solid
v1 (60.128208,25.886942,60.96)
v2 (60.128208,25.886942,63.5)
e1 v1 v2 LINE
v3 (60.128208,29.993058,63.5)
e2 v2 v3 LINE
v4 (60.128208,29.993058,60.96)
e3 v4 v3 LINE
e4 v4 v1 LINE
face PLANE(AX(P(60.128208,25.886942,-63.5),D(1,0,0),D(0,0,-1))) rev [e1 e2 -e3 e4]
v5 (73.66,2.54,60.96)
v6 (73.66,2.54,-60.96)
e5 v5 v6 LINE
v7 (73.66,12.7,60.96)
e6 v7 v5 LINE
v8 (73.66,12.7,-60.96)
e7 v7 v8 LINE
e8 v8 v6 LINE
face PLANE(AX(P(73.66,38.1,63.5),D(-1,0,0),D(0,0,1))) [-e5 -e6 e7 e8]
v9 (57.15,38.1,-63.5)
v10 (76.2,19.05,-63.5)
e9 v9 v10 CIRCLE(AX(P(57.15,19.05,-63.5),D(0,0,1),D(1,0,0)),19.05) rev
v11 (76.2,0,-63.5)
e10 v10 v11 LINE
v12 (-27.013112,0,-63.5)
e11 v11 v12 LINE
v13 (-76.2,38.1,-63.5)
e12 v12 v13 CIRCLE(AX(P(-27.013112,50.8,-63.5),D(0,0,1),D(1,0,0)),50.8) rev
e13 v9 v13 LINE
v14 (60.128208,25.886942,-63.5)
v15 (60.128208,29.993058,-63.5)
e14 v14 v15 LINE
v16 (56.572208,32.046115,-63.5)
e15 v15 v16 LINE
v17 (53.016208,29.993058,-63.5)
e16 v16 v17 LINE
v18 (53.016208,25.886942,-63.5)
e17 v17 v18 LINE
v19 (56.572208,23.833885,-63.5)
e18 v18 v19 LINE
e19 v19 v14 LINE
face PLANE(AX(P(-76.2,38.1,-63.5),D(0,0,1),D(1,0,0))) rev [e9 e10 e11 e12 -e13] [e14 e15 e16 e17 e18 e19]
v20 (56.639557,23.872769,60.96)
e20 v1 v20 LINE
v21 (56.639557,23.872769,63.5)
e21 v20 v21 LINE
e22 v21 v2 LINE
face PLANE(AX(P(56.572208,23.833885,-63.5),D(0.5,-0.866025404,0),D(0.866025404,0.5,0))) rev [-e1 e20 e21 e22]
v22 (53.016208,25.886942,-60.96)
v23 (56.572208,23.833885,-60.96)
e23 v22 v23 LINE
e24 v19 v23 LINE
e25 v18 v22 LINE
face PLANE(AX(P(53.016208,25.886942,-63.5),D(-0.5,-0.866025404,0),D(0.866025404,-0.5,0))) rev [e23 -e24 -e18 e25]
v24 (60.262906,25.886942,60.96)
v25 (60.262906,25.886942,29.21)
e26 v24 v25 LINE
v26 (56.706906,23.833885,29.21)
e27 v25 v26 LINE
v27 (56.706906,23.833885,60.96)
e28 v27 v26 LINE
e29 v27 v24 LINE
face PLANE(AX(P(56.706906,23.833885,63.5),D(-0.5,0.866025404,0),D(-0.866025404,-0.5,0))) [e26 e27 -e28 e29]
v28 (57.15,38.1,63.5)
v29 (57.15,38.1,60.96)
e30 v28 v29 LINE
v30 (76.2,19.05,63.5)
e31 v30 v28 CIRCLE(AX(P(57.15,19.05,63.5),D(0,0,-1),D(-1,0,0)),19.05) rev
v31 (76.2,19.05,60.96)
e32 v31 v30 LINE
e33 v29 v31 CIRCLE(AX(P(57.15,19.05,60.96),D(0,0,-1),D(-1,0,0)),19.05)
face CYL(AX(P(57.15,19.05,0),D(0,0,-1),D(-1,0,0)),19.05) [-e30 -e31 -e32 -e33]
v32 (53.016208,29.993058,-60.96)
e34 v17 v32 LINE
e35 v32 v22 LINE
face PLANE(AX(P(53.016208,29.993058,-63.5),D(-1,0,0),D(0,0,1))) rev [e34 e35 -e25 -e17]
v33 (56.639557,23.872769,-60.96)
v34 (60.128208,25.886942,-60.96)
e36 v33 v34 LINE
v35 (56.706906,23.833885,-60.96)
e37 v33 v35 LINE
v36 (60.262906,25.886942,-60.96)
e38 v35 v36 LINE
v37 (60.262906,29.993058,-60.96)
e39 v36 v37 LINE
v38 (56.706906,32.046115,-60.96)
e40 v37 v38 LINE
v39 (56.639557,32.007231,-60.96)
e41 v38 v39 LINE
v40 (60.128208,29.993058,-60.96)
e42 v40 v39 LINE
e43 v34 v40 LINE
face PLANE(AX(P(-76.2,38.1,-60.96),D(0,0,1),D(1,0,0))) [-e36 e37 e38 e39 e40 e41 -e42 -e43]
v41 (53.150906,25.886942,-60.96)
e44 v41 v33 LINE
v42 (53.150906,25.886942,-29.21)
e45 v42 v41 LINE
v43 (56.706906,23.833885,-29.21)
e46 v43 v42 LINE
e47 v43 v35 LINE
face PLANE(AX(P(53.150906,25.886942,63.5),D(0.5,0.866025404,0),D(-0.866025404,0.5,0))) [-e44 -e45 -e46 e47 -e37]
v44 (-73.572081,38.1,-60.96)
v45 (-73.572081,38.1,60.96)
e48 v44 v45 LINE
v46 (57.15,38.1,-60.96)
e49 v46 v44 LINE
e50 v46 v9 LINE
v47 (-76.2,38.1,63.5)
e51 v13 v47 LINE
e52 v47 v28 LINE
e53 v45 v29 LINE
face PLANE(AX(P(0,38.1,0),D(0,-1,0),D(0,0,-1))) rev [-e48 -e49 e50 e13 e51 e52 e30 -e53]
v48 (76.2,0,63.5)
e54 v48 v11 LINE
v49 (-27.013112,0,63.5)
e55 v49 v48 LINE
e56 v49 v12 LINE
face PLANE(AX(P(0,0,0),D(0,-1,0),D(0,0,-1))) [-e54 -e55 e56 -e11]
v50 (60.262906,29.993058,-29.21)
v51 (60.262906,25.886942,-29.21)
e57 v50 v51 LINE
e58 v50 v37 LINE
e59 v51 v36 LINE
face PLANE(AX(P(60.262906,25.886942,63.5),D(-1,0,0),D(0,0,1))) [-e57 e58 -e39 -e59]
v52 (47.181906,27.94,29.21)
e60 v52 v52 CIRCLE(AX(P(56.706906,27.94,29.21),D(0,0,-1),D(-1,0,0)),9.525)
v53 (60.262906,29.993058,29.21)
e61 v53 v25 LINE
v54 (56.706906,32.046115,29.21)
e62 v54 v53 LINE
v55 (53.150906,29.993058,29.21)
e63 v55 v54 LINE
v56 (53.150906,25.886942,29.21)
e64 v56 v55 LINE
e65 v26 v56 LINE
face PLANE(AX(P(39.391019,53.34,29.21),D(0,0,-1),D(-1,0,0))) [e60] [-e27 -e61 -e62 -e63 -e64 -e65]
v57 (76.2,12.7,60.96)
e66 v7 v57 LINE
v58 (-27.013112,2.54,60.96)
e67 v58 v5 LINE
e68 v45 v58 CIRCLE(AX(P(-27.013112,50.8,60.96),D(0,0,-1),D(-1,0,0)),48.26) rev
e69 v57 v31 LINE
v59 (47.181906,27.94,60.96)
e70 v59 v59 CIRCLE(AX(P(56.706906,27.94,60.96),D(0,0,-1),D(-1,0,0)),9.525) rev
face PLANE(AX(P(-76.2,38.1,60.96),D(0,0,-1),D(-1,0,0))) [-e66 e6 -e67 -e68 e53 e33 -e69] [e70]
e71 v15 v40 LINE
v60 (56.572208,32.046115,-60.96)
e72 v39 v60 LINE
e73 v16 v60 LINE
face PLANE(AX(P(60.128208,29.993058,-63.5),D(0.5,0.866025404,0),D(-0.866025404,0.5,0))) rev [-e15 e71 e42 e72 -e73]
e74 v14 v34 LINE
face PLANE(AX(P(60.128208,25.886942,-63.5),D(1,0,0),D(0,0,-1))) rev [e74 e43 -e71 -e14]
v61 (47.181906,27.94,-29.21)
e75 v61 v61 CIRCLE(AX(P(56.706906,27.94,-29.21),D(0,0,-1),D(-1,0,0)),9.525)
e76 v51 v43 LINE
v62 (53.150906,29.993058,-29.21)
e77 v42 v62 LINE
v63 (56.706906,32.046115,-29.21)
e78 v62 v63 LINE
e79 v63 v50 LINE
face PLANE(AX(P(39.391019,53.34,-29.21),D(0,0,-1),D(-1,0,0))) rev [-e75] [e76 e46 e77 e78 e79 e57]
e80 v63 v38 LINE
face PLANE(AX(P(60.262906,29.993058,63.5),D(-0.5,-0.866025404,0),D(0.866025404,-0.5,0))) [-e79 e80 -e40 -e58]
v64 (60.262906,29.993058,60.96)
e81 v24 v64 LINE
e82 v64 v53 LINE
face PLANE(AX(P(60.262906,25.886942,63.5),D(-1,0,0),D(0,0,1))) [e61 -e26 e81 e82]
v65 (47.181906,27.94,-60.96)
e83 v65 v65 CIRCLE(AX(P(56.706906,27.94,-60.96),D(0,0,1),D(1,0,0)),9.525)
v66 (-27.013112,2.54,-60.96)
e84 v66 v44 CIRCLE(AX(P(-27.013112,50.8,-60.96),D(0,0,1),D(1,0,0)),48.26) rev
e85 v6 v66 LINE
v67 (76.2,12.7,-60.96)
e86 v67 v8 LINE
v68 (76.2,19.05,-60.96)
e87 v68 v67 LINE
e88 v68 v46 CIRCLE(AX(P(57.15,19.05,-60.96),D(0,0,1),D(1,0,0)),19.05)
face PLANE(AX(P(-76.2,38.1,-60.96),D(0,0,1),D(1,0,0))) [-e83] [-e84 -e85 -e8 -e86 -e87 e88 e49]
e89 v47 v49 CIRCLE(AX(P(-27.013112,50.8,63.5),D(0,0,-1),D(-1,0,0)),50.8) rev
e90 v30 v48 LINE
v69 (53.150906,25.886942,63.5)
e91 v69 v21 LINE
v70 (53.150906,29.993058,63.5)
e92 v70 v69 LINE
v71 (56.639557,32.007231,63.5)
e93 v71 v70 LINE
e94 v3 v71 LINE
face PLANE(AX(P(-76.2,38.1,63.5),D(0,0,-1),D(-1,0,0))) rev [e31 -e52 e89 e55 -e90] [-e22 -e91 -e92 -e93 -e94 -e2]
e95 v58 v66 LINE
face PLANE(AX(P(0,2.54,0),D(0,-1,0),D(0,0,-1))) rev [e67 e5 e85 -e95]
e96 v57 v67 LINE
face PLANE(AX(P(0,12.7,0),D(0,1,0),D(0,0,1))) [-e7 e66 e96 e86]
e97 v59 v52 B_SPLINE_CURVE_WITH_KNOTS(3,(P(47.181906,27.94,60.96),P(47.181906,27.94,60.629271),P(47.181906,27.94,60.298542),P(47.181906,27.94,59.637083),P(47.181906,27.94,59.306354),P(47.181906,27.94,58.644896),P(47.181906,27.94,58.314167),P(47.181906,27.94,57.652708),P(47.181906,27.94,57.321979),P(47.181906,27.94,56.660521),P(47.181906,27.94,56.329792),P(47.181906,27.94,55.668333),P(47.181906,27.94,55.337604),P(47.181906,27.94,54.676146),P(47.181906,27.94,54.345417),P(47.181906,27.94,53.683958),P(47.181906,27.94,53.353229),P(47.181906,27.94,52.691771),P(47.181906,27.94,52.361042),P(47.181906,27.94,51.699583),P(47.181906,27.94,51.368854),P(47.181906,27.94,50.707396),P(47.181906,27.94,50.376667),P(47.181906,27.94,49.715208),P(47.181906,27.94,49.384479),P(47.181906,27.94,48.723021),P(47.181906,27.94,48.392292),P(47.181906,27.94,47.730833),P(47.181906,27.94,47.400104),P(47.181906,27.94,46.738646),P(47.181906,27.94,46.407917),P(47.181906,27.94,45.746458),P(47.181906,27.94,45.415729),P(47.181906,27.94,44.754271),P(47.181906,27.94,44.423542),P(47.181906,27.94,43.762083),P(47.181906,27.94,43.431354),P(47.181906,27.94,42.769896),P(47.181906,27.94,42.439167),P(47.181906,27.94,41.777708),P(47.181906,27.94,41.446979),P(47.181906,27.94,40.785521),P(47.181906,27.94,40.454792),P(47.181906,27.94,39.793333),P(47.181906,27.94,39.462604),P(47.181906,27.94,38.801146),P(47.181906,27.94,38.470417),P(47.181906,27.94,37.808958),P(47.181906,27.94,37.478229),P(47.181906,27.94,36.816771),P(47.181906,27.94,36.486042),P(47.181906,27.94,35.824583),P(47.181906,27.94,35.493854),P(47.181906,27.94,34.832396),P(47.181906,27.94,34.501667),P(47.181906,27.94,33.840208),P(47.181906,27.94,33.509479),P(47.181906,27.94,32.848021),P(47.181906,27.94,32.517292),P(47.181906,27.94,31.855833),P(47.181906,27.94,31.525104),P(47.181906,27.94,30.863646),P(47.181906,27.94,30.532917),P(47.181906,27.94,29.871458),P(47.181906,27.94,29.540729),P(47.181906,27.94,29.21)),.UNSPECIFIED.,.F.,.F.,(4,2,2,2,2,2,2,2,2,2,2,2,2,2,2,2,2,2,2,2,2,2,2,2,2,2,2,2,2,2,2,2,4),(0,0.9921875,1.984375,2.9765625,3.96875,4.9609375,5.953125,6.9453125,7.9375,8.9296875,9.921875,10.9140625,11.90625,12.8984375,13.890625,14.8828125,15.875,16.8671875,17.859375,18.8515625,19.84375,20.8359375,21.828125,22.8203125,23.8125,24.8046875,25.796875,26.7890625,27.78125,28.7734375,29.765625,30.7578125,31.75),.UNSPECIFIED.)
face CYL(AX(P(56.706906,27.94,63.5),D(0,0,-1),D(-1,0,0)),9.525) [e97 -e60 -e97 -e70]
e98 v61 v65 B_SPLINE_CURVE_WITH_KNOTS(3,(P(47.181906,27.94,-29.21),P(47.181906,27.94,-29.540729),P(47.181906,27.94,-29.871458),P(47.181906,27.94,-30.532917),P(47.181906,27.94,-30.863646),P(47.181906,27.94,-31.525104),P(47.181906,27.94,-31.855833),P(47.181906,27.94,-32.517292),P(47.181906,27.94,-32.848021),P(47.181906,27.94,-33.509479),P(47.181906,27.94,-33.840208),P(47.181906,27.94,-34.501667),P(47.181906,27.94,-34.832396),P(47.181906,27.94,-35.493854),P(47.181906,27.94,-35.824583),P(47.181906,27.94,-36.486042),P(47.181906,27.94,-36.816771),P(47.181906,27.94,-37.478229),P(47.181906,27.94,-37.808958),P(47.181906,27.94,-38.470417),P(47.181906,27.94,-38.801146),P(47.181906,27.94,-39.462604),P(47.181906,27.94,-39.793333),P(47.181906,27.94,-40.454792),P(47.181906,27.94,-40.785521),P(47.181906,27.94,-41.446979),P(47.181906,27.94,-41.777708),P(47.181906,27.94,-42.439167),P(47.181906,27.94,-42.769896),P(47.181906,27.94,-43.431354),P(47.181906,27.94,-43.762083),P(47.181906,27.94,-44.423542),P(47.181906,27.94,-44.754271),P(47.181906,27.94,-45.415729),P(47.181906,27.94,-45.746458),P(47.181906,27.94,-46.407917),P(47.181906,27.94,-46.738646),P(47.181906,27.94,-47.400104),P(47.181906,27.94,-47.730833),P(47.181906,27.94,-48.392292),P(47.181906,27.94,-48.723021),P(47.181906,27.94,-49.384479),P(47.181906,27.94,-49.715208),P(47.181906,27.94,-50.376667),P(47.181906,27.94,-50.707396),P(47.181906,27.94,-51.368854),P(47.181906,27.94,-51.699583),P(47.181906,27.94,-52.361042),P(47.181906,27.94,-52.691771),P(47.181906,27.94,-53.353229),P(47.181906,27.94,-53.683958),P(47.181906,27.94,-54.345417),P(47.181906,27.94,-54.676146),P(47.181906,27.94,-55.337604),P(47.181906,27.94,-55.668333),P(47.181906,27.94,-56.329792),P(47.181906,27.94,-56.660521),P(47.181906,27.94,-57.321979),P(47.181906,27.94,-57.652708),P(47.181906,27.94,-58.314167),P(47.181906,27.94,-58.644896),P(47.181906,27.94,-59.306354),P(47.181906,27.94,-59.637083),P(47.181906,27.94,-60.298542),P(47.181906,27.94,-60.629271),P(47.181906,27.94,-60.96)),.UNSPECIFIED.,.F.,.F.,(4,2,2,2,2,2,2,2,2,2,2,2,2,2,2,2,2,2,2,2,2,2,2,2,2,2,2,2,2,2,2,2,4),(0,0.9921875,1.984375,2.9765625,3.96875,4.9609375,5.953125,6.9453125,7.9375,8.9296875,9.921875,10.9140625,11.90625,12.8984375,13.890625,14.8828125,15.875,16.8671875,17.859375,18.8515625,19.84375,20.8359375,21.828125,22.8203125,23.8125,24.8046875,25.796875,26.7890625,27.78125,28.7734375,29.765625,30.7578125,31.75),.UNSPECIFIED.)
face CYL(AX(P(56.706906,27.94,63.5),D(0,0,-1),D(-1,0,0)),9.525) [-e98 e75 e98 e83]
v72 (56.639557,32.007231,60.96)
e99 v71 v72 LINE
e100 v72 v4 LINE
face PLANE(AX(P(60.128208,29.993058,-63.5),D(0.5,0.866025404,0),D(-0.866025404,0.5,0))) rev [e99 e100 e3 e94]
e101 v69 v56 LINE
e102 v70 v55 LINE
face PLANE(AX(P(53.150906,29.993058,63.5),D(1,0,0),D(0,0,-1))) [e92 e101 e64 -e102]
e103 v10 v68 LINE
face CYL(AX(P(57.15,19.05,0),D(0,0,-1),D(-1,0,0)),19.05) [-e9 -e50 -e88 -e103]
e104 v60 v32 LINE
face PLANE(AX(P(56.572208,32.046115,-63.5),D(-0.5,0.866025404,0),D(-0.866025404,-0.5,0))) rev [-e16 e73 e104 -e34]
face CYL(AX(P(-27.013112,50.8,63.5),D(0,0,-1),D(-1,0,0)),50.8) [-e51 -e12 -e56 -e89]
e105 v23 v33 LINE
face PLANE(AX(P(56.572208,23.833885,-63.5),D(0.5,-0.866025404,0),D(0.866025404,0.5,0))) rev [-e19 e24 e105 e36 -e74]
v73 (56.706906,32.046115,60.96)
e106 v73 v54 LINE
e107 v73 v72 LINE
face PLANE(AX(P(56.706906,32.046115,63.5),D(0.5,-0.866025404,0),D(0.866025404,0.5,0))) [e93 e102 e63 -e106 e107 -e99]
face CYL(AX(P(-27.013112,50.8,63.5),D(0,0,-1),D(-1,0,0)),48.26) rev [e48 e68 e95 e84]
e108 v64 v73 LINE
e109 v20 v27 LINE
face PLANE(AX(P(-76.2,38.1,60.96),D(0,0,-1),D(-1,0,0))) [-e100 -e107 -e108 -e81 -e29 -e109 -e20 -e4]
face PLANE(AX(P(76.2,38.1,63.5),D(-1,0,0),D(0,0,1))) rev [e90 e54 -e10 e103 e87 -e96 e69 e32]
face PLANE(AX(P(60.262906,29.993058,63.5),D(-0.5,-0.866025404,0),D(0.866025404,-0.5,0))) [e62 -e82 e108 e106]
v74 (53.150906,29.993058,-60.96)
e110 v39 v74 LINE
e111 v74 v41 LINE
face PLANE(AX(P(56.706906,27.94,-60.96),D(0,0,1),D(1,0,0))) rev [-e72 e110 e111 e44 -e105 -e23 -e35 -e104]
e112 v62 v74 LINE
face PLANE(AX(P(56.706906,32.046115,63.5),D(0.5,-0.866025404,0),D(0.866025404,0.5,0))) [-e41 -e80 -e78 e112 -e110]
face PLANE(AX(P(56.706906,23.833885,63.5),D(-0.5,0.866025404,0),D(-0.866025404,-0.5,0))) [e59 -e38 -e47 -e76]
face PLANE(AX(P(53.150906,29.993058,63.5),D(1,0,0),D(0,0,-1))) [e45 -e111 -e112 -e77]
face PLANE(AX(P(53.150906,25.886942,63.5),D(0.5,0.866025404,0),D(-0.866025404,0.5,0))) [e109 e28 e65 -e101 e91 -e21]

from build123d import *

# Parameters (mm, degrees)
SKETCH1_W               = 152.4
SKETCH1_H               = 127
BOSS_EXTRUDE1_DEPTH     = 38.1
FILLET1_R               = 50.8
SHELL1_T                = -2.54
CUT_EXTRUDE2_DEPTH      = 151.825533647
CUT_EXTRUDE2_DEPTH_BACK = 151.825533647
SKETCH4_R               = 9.525
BOSS_EXTRUDE2_DEPTH     = 124.46
SKETCH2_W               = 11.613456366
SKETCH2_H               = 121.92
CUT_EXTRUDE3_DEPTH      = 25.4
SKETCH5_W               = 29.081811675
SKETCH5_H               = 58.42
CUT_EXTRUDE4_DEPTH      = 50.8
FILLET3_R               = 19.05


with BuildPart() as part:
    # Sketch1 → Boss-Extrude1 (new body)
    with BuildSketch(Plane(origin=(0, 0, 0), x_dir=(1, 0, 0), z_dir=(0, 1, 0))):
        Rectangle(SKETCH1_W, SKETCH1_H)
    extrude(amount=BOSS_EXTRUDE1_DEPTH)

    # Fillet1
    # the kernel refuses this fillet: 50.8 mm, written as the material it takes off along each edge
    with BuildSketch(Plane(origin=(-76.2, 0, -186.467221242), x_dir=(0, 1, 0), z_dir=(0, 0, 1))) as fillet1_piece_1:
        with BuildLine():
            CenterArc((50.8, -49.186888497), FILLET1_R, 104.477512186, 75.522487814)
            Line((0, -49.186888497), (-1.016, -49.186888497))
            Line((-1.016, -49.186888497), (-1.016, 0))
            Line((-1.016, 0), (0, 1.016))
            ThreePointArc((0, 1.016), (19.05, 1.016), (37.846, 0.98373777))
            Line((37.846, 0.98373777), (38.1, 0))
        make_face()
    extrude(amount=372.934442484, mode=Mode.SUBTRACT)

    # Shell1
    shell1_openings = [part.faces().sort_by_distance(p)[0] for p in [
        (0, 38.1, 0),
    ]]
    offset(amount=SHELL1_T, openings=shell1_openings, kind=Kind.INTERSECTION)

    # Sketch3 → Cut-Extrude2 (cut, two sides: drawn at the far end of the back side and taken through both)
    with BuildSketch(Plane.XY.offset(-60.96).offset(-CUT_EXTRUDE2_DEPTH_BACK)):
        Polygon((56.572208389, 32.046115114), (53.016208389, 29.993057557), (53.016208389, 25.886942443), (56.572208389, 23.833884886), (60.128208389, 25.886942443), (60.128208389, 29.993057557), align=None)
    extrude(amount=CUT_EXTRUDE2_DEPTH + CUT_EXTRUDE2_DEPTH_BACK, mode=Mode.SUBTRACT)

    # Sketch4 → Boss-Extrude2 (add)
    with BuildSketch(Plane.XY.offset(-60.96)):
        with Locations(Location((56.706906113, 27.94, 0), (0, 0, 180))):
            Circle(SKETCH4_R)
        Polygon((56.706906113, 32.046115114), (53.150906113, 29.993057557), (53.150906113, 25.886942443), (56.706906113, 23.833884886), (60.262906113, 25.886942443), (60.262906113, 29.993057557), align=None, mode=Mode.SUBTRACT)
    extrude(amount=BOSS_EXTRUDE2_DEPTH)

    # Sketch2 → Cut-Extrude3 (cut)
    with BuildSketch(Plane(origin=(0, 38.1, 0), x_dir=(1, 0, 0), z_dir=(0, 1, 0))):
        with Locations((78.243168089, 0)):
            Rectangle(SKETCH2_W, SKETCH2_H)
    extrude(amount=-CUT_EXTRUDE3_DEPTH, mode=Mode.SUBTRACT)

    # Sketch5 → Cut-Extrude4 (cut)
    with BuildSketch(Plane(origin=(0, 2.54, 0), x_dir=(1, 0, 0), z_dir=(0, 1, 0))):
        with Locations((53.93192453, 0)):
            Rectangle(SKETCH5_W, SKETCH5_H)
    extrude(amount=CUT_EXTRUDE4_DEPTH, mode=Mode.SUBTRACT)

    # Fillet3
    fillet3_edges = [part.edges().sort_by_distance(p)[0] for p in [
        (76.2, 38.1, 62.23),
        (76.2, 38.1, -62.23),
    ]]
    fillet(fillet3_edges, radius=FILLET3_R)


solid = part.part
